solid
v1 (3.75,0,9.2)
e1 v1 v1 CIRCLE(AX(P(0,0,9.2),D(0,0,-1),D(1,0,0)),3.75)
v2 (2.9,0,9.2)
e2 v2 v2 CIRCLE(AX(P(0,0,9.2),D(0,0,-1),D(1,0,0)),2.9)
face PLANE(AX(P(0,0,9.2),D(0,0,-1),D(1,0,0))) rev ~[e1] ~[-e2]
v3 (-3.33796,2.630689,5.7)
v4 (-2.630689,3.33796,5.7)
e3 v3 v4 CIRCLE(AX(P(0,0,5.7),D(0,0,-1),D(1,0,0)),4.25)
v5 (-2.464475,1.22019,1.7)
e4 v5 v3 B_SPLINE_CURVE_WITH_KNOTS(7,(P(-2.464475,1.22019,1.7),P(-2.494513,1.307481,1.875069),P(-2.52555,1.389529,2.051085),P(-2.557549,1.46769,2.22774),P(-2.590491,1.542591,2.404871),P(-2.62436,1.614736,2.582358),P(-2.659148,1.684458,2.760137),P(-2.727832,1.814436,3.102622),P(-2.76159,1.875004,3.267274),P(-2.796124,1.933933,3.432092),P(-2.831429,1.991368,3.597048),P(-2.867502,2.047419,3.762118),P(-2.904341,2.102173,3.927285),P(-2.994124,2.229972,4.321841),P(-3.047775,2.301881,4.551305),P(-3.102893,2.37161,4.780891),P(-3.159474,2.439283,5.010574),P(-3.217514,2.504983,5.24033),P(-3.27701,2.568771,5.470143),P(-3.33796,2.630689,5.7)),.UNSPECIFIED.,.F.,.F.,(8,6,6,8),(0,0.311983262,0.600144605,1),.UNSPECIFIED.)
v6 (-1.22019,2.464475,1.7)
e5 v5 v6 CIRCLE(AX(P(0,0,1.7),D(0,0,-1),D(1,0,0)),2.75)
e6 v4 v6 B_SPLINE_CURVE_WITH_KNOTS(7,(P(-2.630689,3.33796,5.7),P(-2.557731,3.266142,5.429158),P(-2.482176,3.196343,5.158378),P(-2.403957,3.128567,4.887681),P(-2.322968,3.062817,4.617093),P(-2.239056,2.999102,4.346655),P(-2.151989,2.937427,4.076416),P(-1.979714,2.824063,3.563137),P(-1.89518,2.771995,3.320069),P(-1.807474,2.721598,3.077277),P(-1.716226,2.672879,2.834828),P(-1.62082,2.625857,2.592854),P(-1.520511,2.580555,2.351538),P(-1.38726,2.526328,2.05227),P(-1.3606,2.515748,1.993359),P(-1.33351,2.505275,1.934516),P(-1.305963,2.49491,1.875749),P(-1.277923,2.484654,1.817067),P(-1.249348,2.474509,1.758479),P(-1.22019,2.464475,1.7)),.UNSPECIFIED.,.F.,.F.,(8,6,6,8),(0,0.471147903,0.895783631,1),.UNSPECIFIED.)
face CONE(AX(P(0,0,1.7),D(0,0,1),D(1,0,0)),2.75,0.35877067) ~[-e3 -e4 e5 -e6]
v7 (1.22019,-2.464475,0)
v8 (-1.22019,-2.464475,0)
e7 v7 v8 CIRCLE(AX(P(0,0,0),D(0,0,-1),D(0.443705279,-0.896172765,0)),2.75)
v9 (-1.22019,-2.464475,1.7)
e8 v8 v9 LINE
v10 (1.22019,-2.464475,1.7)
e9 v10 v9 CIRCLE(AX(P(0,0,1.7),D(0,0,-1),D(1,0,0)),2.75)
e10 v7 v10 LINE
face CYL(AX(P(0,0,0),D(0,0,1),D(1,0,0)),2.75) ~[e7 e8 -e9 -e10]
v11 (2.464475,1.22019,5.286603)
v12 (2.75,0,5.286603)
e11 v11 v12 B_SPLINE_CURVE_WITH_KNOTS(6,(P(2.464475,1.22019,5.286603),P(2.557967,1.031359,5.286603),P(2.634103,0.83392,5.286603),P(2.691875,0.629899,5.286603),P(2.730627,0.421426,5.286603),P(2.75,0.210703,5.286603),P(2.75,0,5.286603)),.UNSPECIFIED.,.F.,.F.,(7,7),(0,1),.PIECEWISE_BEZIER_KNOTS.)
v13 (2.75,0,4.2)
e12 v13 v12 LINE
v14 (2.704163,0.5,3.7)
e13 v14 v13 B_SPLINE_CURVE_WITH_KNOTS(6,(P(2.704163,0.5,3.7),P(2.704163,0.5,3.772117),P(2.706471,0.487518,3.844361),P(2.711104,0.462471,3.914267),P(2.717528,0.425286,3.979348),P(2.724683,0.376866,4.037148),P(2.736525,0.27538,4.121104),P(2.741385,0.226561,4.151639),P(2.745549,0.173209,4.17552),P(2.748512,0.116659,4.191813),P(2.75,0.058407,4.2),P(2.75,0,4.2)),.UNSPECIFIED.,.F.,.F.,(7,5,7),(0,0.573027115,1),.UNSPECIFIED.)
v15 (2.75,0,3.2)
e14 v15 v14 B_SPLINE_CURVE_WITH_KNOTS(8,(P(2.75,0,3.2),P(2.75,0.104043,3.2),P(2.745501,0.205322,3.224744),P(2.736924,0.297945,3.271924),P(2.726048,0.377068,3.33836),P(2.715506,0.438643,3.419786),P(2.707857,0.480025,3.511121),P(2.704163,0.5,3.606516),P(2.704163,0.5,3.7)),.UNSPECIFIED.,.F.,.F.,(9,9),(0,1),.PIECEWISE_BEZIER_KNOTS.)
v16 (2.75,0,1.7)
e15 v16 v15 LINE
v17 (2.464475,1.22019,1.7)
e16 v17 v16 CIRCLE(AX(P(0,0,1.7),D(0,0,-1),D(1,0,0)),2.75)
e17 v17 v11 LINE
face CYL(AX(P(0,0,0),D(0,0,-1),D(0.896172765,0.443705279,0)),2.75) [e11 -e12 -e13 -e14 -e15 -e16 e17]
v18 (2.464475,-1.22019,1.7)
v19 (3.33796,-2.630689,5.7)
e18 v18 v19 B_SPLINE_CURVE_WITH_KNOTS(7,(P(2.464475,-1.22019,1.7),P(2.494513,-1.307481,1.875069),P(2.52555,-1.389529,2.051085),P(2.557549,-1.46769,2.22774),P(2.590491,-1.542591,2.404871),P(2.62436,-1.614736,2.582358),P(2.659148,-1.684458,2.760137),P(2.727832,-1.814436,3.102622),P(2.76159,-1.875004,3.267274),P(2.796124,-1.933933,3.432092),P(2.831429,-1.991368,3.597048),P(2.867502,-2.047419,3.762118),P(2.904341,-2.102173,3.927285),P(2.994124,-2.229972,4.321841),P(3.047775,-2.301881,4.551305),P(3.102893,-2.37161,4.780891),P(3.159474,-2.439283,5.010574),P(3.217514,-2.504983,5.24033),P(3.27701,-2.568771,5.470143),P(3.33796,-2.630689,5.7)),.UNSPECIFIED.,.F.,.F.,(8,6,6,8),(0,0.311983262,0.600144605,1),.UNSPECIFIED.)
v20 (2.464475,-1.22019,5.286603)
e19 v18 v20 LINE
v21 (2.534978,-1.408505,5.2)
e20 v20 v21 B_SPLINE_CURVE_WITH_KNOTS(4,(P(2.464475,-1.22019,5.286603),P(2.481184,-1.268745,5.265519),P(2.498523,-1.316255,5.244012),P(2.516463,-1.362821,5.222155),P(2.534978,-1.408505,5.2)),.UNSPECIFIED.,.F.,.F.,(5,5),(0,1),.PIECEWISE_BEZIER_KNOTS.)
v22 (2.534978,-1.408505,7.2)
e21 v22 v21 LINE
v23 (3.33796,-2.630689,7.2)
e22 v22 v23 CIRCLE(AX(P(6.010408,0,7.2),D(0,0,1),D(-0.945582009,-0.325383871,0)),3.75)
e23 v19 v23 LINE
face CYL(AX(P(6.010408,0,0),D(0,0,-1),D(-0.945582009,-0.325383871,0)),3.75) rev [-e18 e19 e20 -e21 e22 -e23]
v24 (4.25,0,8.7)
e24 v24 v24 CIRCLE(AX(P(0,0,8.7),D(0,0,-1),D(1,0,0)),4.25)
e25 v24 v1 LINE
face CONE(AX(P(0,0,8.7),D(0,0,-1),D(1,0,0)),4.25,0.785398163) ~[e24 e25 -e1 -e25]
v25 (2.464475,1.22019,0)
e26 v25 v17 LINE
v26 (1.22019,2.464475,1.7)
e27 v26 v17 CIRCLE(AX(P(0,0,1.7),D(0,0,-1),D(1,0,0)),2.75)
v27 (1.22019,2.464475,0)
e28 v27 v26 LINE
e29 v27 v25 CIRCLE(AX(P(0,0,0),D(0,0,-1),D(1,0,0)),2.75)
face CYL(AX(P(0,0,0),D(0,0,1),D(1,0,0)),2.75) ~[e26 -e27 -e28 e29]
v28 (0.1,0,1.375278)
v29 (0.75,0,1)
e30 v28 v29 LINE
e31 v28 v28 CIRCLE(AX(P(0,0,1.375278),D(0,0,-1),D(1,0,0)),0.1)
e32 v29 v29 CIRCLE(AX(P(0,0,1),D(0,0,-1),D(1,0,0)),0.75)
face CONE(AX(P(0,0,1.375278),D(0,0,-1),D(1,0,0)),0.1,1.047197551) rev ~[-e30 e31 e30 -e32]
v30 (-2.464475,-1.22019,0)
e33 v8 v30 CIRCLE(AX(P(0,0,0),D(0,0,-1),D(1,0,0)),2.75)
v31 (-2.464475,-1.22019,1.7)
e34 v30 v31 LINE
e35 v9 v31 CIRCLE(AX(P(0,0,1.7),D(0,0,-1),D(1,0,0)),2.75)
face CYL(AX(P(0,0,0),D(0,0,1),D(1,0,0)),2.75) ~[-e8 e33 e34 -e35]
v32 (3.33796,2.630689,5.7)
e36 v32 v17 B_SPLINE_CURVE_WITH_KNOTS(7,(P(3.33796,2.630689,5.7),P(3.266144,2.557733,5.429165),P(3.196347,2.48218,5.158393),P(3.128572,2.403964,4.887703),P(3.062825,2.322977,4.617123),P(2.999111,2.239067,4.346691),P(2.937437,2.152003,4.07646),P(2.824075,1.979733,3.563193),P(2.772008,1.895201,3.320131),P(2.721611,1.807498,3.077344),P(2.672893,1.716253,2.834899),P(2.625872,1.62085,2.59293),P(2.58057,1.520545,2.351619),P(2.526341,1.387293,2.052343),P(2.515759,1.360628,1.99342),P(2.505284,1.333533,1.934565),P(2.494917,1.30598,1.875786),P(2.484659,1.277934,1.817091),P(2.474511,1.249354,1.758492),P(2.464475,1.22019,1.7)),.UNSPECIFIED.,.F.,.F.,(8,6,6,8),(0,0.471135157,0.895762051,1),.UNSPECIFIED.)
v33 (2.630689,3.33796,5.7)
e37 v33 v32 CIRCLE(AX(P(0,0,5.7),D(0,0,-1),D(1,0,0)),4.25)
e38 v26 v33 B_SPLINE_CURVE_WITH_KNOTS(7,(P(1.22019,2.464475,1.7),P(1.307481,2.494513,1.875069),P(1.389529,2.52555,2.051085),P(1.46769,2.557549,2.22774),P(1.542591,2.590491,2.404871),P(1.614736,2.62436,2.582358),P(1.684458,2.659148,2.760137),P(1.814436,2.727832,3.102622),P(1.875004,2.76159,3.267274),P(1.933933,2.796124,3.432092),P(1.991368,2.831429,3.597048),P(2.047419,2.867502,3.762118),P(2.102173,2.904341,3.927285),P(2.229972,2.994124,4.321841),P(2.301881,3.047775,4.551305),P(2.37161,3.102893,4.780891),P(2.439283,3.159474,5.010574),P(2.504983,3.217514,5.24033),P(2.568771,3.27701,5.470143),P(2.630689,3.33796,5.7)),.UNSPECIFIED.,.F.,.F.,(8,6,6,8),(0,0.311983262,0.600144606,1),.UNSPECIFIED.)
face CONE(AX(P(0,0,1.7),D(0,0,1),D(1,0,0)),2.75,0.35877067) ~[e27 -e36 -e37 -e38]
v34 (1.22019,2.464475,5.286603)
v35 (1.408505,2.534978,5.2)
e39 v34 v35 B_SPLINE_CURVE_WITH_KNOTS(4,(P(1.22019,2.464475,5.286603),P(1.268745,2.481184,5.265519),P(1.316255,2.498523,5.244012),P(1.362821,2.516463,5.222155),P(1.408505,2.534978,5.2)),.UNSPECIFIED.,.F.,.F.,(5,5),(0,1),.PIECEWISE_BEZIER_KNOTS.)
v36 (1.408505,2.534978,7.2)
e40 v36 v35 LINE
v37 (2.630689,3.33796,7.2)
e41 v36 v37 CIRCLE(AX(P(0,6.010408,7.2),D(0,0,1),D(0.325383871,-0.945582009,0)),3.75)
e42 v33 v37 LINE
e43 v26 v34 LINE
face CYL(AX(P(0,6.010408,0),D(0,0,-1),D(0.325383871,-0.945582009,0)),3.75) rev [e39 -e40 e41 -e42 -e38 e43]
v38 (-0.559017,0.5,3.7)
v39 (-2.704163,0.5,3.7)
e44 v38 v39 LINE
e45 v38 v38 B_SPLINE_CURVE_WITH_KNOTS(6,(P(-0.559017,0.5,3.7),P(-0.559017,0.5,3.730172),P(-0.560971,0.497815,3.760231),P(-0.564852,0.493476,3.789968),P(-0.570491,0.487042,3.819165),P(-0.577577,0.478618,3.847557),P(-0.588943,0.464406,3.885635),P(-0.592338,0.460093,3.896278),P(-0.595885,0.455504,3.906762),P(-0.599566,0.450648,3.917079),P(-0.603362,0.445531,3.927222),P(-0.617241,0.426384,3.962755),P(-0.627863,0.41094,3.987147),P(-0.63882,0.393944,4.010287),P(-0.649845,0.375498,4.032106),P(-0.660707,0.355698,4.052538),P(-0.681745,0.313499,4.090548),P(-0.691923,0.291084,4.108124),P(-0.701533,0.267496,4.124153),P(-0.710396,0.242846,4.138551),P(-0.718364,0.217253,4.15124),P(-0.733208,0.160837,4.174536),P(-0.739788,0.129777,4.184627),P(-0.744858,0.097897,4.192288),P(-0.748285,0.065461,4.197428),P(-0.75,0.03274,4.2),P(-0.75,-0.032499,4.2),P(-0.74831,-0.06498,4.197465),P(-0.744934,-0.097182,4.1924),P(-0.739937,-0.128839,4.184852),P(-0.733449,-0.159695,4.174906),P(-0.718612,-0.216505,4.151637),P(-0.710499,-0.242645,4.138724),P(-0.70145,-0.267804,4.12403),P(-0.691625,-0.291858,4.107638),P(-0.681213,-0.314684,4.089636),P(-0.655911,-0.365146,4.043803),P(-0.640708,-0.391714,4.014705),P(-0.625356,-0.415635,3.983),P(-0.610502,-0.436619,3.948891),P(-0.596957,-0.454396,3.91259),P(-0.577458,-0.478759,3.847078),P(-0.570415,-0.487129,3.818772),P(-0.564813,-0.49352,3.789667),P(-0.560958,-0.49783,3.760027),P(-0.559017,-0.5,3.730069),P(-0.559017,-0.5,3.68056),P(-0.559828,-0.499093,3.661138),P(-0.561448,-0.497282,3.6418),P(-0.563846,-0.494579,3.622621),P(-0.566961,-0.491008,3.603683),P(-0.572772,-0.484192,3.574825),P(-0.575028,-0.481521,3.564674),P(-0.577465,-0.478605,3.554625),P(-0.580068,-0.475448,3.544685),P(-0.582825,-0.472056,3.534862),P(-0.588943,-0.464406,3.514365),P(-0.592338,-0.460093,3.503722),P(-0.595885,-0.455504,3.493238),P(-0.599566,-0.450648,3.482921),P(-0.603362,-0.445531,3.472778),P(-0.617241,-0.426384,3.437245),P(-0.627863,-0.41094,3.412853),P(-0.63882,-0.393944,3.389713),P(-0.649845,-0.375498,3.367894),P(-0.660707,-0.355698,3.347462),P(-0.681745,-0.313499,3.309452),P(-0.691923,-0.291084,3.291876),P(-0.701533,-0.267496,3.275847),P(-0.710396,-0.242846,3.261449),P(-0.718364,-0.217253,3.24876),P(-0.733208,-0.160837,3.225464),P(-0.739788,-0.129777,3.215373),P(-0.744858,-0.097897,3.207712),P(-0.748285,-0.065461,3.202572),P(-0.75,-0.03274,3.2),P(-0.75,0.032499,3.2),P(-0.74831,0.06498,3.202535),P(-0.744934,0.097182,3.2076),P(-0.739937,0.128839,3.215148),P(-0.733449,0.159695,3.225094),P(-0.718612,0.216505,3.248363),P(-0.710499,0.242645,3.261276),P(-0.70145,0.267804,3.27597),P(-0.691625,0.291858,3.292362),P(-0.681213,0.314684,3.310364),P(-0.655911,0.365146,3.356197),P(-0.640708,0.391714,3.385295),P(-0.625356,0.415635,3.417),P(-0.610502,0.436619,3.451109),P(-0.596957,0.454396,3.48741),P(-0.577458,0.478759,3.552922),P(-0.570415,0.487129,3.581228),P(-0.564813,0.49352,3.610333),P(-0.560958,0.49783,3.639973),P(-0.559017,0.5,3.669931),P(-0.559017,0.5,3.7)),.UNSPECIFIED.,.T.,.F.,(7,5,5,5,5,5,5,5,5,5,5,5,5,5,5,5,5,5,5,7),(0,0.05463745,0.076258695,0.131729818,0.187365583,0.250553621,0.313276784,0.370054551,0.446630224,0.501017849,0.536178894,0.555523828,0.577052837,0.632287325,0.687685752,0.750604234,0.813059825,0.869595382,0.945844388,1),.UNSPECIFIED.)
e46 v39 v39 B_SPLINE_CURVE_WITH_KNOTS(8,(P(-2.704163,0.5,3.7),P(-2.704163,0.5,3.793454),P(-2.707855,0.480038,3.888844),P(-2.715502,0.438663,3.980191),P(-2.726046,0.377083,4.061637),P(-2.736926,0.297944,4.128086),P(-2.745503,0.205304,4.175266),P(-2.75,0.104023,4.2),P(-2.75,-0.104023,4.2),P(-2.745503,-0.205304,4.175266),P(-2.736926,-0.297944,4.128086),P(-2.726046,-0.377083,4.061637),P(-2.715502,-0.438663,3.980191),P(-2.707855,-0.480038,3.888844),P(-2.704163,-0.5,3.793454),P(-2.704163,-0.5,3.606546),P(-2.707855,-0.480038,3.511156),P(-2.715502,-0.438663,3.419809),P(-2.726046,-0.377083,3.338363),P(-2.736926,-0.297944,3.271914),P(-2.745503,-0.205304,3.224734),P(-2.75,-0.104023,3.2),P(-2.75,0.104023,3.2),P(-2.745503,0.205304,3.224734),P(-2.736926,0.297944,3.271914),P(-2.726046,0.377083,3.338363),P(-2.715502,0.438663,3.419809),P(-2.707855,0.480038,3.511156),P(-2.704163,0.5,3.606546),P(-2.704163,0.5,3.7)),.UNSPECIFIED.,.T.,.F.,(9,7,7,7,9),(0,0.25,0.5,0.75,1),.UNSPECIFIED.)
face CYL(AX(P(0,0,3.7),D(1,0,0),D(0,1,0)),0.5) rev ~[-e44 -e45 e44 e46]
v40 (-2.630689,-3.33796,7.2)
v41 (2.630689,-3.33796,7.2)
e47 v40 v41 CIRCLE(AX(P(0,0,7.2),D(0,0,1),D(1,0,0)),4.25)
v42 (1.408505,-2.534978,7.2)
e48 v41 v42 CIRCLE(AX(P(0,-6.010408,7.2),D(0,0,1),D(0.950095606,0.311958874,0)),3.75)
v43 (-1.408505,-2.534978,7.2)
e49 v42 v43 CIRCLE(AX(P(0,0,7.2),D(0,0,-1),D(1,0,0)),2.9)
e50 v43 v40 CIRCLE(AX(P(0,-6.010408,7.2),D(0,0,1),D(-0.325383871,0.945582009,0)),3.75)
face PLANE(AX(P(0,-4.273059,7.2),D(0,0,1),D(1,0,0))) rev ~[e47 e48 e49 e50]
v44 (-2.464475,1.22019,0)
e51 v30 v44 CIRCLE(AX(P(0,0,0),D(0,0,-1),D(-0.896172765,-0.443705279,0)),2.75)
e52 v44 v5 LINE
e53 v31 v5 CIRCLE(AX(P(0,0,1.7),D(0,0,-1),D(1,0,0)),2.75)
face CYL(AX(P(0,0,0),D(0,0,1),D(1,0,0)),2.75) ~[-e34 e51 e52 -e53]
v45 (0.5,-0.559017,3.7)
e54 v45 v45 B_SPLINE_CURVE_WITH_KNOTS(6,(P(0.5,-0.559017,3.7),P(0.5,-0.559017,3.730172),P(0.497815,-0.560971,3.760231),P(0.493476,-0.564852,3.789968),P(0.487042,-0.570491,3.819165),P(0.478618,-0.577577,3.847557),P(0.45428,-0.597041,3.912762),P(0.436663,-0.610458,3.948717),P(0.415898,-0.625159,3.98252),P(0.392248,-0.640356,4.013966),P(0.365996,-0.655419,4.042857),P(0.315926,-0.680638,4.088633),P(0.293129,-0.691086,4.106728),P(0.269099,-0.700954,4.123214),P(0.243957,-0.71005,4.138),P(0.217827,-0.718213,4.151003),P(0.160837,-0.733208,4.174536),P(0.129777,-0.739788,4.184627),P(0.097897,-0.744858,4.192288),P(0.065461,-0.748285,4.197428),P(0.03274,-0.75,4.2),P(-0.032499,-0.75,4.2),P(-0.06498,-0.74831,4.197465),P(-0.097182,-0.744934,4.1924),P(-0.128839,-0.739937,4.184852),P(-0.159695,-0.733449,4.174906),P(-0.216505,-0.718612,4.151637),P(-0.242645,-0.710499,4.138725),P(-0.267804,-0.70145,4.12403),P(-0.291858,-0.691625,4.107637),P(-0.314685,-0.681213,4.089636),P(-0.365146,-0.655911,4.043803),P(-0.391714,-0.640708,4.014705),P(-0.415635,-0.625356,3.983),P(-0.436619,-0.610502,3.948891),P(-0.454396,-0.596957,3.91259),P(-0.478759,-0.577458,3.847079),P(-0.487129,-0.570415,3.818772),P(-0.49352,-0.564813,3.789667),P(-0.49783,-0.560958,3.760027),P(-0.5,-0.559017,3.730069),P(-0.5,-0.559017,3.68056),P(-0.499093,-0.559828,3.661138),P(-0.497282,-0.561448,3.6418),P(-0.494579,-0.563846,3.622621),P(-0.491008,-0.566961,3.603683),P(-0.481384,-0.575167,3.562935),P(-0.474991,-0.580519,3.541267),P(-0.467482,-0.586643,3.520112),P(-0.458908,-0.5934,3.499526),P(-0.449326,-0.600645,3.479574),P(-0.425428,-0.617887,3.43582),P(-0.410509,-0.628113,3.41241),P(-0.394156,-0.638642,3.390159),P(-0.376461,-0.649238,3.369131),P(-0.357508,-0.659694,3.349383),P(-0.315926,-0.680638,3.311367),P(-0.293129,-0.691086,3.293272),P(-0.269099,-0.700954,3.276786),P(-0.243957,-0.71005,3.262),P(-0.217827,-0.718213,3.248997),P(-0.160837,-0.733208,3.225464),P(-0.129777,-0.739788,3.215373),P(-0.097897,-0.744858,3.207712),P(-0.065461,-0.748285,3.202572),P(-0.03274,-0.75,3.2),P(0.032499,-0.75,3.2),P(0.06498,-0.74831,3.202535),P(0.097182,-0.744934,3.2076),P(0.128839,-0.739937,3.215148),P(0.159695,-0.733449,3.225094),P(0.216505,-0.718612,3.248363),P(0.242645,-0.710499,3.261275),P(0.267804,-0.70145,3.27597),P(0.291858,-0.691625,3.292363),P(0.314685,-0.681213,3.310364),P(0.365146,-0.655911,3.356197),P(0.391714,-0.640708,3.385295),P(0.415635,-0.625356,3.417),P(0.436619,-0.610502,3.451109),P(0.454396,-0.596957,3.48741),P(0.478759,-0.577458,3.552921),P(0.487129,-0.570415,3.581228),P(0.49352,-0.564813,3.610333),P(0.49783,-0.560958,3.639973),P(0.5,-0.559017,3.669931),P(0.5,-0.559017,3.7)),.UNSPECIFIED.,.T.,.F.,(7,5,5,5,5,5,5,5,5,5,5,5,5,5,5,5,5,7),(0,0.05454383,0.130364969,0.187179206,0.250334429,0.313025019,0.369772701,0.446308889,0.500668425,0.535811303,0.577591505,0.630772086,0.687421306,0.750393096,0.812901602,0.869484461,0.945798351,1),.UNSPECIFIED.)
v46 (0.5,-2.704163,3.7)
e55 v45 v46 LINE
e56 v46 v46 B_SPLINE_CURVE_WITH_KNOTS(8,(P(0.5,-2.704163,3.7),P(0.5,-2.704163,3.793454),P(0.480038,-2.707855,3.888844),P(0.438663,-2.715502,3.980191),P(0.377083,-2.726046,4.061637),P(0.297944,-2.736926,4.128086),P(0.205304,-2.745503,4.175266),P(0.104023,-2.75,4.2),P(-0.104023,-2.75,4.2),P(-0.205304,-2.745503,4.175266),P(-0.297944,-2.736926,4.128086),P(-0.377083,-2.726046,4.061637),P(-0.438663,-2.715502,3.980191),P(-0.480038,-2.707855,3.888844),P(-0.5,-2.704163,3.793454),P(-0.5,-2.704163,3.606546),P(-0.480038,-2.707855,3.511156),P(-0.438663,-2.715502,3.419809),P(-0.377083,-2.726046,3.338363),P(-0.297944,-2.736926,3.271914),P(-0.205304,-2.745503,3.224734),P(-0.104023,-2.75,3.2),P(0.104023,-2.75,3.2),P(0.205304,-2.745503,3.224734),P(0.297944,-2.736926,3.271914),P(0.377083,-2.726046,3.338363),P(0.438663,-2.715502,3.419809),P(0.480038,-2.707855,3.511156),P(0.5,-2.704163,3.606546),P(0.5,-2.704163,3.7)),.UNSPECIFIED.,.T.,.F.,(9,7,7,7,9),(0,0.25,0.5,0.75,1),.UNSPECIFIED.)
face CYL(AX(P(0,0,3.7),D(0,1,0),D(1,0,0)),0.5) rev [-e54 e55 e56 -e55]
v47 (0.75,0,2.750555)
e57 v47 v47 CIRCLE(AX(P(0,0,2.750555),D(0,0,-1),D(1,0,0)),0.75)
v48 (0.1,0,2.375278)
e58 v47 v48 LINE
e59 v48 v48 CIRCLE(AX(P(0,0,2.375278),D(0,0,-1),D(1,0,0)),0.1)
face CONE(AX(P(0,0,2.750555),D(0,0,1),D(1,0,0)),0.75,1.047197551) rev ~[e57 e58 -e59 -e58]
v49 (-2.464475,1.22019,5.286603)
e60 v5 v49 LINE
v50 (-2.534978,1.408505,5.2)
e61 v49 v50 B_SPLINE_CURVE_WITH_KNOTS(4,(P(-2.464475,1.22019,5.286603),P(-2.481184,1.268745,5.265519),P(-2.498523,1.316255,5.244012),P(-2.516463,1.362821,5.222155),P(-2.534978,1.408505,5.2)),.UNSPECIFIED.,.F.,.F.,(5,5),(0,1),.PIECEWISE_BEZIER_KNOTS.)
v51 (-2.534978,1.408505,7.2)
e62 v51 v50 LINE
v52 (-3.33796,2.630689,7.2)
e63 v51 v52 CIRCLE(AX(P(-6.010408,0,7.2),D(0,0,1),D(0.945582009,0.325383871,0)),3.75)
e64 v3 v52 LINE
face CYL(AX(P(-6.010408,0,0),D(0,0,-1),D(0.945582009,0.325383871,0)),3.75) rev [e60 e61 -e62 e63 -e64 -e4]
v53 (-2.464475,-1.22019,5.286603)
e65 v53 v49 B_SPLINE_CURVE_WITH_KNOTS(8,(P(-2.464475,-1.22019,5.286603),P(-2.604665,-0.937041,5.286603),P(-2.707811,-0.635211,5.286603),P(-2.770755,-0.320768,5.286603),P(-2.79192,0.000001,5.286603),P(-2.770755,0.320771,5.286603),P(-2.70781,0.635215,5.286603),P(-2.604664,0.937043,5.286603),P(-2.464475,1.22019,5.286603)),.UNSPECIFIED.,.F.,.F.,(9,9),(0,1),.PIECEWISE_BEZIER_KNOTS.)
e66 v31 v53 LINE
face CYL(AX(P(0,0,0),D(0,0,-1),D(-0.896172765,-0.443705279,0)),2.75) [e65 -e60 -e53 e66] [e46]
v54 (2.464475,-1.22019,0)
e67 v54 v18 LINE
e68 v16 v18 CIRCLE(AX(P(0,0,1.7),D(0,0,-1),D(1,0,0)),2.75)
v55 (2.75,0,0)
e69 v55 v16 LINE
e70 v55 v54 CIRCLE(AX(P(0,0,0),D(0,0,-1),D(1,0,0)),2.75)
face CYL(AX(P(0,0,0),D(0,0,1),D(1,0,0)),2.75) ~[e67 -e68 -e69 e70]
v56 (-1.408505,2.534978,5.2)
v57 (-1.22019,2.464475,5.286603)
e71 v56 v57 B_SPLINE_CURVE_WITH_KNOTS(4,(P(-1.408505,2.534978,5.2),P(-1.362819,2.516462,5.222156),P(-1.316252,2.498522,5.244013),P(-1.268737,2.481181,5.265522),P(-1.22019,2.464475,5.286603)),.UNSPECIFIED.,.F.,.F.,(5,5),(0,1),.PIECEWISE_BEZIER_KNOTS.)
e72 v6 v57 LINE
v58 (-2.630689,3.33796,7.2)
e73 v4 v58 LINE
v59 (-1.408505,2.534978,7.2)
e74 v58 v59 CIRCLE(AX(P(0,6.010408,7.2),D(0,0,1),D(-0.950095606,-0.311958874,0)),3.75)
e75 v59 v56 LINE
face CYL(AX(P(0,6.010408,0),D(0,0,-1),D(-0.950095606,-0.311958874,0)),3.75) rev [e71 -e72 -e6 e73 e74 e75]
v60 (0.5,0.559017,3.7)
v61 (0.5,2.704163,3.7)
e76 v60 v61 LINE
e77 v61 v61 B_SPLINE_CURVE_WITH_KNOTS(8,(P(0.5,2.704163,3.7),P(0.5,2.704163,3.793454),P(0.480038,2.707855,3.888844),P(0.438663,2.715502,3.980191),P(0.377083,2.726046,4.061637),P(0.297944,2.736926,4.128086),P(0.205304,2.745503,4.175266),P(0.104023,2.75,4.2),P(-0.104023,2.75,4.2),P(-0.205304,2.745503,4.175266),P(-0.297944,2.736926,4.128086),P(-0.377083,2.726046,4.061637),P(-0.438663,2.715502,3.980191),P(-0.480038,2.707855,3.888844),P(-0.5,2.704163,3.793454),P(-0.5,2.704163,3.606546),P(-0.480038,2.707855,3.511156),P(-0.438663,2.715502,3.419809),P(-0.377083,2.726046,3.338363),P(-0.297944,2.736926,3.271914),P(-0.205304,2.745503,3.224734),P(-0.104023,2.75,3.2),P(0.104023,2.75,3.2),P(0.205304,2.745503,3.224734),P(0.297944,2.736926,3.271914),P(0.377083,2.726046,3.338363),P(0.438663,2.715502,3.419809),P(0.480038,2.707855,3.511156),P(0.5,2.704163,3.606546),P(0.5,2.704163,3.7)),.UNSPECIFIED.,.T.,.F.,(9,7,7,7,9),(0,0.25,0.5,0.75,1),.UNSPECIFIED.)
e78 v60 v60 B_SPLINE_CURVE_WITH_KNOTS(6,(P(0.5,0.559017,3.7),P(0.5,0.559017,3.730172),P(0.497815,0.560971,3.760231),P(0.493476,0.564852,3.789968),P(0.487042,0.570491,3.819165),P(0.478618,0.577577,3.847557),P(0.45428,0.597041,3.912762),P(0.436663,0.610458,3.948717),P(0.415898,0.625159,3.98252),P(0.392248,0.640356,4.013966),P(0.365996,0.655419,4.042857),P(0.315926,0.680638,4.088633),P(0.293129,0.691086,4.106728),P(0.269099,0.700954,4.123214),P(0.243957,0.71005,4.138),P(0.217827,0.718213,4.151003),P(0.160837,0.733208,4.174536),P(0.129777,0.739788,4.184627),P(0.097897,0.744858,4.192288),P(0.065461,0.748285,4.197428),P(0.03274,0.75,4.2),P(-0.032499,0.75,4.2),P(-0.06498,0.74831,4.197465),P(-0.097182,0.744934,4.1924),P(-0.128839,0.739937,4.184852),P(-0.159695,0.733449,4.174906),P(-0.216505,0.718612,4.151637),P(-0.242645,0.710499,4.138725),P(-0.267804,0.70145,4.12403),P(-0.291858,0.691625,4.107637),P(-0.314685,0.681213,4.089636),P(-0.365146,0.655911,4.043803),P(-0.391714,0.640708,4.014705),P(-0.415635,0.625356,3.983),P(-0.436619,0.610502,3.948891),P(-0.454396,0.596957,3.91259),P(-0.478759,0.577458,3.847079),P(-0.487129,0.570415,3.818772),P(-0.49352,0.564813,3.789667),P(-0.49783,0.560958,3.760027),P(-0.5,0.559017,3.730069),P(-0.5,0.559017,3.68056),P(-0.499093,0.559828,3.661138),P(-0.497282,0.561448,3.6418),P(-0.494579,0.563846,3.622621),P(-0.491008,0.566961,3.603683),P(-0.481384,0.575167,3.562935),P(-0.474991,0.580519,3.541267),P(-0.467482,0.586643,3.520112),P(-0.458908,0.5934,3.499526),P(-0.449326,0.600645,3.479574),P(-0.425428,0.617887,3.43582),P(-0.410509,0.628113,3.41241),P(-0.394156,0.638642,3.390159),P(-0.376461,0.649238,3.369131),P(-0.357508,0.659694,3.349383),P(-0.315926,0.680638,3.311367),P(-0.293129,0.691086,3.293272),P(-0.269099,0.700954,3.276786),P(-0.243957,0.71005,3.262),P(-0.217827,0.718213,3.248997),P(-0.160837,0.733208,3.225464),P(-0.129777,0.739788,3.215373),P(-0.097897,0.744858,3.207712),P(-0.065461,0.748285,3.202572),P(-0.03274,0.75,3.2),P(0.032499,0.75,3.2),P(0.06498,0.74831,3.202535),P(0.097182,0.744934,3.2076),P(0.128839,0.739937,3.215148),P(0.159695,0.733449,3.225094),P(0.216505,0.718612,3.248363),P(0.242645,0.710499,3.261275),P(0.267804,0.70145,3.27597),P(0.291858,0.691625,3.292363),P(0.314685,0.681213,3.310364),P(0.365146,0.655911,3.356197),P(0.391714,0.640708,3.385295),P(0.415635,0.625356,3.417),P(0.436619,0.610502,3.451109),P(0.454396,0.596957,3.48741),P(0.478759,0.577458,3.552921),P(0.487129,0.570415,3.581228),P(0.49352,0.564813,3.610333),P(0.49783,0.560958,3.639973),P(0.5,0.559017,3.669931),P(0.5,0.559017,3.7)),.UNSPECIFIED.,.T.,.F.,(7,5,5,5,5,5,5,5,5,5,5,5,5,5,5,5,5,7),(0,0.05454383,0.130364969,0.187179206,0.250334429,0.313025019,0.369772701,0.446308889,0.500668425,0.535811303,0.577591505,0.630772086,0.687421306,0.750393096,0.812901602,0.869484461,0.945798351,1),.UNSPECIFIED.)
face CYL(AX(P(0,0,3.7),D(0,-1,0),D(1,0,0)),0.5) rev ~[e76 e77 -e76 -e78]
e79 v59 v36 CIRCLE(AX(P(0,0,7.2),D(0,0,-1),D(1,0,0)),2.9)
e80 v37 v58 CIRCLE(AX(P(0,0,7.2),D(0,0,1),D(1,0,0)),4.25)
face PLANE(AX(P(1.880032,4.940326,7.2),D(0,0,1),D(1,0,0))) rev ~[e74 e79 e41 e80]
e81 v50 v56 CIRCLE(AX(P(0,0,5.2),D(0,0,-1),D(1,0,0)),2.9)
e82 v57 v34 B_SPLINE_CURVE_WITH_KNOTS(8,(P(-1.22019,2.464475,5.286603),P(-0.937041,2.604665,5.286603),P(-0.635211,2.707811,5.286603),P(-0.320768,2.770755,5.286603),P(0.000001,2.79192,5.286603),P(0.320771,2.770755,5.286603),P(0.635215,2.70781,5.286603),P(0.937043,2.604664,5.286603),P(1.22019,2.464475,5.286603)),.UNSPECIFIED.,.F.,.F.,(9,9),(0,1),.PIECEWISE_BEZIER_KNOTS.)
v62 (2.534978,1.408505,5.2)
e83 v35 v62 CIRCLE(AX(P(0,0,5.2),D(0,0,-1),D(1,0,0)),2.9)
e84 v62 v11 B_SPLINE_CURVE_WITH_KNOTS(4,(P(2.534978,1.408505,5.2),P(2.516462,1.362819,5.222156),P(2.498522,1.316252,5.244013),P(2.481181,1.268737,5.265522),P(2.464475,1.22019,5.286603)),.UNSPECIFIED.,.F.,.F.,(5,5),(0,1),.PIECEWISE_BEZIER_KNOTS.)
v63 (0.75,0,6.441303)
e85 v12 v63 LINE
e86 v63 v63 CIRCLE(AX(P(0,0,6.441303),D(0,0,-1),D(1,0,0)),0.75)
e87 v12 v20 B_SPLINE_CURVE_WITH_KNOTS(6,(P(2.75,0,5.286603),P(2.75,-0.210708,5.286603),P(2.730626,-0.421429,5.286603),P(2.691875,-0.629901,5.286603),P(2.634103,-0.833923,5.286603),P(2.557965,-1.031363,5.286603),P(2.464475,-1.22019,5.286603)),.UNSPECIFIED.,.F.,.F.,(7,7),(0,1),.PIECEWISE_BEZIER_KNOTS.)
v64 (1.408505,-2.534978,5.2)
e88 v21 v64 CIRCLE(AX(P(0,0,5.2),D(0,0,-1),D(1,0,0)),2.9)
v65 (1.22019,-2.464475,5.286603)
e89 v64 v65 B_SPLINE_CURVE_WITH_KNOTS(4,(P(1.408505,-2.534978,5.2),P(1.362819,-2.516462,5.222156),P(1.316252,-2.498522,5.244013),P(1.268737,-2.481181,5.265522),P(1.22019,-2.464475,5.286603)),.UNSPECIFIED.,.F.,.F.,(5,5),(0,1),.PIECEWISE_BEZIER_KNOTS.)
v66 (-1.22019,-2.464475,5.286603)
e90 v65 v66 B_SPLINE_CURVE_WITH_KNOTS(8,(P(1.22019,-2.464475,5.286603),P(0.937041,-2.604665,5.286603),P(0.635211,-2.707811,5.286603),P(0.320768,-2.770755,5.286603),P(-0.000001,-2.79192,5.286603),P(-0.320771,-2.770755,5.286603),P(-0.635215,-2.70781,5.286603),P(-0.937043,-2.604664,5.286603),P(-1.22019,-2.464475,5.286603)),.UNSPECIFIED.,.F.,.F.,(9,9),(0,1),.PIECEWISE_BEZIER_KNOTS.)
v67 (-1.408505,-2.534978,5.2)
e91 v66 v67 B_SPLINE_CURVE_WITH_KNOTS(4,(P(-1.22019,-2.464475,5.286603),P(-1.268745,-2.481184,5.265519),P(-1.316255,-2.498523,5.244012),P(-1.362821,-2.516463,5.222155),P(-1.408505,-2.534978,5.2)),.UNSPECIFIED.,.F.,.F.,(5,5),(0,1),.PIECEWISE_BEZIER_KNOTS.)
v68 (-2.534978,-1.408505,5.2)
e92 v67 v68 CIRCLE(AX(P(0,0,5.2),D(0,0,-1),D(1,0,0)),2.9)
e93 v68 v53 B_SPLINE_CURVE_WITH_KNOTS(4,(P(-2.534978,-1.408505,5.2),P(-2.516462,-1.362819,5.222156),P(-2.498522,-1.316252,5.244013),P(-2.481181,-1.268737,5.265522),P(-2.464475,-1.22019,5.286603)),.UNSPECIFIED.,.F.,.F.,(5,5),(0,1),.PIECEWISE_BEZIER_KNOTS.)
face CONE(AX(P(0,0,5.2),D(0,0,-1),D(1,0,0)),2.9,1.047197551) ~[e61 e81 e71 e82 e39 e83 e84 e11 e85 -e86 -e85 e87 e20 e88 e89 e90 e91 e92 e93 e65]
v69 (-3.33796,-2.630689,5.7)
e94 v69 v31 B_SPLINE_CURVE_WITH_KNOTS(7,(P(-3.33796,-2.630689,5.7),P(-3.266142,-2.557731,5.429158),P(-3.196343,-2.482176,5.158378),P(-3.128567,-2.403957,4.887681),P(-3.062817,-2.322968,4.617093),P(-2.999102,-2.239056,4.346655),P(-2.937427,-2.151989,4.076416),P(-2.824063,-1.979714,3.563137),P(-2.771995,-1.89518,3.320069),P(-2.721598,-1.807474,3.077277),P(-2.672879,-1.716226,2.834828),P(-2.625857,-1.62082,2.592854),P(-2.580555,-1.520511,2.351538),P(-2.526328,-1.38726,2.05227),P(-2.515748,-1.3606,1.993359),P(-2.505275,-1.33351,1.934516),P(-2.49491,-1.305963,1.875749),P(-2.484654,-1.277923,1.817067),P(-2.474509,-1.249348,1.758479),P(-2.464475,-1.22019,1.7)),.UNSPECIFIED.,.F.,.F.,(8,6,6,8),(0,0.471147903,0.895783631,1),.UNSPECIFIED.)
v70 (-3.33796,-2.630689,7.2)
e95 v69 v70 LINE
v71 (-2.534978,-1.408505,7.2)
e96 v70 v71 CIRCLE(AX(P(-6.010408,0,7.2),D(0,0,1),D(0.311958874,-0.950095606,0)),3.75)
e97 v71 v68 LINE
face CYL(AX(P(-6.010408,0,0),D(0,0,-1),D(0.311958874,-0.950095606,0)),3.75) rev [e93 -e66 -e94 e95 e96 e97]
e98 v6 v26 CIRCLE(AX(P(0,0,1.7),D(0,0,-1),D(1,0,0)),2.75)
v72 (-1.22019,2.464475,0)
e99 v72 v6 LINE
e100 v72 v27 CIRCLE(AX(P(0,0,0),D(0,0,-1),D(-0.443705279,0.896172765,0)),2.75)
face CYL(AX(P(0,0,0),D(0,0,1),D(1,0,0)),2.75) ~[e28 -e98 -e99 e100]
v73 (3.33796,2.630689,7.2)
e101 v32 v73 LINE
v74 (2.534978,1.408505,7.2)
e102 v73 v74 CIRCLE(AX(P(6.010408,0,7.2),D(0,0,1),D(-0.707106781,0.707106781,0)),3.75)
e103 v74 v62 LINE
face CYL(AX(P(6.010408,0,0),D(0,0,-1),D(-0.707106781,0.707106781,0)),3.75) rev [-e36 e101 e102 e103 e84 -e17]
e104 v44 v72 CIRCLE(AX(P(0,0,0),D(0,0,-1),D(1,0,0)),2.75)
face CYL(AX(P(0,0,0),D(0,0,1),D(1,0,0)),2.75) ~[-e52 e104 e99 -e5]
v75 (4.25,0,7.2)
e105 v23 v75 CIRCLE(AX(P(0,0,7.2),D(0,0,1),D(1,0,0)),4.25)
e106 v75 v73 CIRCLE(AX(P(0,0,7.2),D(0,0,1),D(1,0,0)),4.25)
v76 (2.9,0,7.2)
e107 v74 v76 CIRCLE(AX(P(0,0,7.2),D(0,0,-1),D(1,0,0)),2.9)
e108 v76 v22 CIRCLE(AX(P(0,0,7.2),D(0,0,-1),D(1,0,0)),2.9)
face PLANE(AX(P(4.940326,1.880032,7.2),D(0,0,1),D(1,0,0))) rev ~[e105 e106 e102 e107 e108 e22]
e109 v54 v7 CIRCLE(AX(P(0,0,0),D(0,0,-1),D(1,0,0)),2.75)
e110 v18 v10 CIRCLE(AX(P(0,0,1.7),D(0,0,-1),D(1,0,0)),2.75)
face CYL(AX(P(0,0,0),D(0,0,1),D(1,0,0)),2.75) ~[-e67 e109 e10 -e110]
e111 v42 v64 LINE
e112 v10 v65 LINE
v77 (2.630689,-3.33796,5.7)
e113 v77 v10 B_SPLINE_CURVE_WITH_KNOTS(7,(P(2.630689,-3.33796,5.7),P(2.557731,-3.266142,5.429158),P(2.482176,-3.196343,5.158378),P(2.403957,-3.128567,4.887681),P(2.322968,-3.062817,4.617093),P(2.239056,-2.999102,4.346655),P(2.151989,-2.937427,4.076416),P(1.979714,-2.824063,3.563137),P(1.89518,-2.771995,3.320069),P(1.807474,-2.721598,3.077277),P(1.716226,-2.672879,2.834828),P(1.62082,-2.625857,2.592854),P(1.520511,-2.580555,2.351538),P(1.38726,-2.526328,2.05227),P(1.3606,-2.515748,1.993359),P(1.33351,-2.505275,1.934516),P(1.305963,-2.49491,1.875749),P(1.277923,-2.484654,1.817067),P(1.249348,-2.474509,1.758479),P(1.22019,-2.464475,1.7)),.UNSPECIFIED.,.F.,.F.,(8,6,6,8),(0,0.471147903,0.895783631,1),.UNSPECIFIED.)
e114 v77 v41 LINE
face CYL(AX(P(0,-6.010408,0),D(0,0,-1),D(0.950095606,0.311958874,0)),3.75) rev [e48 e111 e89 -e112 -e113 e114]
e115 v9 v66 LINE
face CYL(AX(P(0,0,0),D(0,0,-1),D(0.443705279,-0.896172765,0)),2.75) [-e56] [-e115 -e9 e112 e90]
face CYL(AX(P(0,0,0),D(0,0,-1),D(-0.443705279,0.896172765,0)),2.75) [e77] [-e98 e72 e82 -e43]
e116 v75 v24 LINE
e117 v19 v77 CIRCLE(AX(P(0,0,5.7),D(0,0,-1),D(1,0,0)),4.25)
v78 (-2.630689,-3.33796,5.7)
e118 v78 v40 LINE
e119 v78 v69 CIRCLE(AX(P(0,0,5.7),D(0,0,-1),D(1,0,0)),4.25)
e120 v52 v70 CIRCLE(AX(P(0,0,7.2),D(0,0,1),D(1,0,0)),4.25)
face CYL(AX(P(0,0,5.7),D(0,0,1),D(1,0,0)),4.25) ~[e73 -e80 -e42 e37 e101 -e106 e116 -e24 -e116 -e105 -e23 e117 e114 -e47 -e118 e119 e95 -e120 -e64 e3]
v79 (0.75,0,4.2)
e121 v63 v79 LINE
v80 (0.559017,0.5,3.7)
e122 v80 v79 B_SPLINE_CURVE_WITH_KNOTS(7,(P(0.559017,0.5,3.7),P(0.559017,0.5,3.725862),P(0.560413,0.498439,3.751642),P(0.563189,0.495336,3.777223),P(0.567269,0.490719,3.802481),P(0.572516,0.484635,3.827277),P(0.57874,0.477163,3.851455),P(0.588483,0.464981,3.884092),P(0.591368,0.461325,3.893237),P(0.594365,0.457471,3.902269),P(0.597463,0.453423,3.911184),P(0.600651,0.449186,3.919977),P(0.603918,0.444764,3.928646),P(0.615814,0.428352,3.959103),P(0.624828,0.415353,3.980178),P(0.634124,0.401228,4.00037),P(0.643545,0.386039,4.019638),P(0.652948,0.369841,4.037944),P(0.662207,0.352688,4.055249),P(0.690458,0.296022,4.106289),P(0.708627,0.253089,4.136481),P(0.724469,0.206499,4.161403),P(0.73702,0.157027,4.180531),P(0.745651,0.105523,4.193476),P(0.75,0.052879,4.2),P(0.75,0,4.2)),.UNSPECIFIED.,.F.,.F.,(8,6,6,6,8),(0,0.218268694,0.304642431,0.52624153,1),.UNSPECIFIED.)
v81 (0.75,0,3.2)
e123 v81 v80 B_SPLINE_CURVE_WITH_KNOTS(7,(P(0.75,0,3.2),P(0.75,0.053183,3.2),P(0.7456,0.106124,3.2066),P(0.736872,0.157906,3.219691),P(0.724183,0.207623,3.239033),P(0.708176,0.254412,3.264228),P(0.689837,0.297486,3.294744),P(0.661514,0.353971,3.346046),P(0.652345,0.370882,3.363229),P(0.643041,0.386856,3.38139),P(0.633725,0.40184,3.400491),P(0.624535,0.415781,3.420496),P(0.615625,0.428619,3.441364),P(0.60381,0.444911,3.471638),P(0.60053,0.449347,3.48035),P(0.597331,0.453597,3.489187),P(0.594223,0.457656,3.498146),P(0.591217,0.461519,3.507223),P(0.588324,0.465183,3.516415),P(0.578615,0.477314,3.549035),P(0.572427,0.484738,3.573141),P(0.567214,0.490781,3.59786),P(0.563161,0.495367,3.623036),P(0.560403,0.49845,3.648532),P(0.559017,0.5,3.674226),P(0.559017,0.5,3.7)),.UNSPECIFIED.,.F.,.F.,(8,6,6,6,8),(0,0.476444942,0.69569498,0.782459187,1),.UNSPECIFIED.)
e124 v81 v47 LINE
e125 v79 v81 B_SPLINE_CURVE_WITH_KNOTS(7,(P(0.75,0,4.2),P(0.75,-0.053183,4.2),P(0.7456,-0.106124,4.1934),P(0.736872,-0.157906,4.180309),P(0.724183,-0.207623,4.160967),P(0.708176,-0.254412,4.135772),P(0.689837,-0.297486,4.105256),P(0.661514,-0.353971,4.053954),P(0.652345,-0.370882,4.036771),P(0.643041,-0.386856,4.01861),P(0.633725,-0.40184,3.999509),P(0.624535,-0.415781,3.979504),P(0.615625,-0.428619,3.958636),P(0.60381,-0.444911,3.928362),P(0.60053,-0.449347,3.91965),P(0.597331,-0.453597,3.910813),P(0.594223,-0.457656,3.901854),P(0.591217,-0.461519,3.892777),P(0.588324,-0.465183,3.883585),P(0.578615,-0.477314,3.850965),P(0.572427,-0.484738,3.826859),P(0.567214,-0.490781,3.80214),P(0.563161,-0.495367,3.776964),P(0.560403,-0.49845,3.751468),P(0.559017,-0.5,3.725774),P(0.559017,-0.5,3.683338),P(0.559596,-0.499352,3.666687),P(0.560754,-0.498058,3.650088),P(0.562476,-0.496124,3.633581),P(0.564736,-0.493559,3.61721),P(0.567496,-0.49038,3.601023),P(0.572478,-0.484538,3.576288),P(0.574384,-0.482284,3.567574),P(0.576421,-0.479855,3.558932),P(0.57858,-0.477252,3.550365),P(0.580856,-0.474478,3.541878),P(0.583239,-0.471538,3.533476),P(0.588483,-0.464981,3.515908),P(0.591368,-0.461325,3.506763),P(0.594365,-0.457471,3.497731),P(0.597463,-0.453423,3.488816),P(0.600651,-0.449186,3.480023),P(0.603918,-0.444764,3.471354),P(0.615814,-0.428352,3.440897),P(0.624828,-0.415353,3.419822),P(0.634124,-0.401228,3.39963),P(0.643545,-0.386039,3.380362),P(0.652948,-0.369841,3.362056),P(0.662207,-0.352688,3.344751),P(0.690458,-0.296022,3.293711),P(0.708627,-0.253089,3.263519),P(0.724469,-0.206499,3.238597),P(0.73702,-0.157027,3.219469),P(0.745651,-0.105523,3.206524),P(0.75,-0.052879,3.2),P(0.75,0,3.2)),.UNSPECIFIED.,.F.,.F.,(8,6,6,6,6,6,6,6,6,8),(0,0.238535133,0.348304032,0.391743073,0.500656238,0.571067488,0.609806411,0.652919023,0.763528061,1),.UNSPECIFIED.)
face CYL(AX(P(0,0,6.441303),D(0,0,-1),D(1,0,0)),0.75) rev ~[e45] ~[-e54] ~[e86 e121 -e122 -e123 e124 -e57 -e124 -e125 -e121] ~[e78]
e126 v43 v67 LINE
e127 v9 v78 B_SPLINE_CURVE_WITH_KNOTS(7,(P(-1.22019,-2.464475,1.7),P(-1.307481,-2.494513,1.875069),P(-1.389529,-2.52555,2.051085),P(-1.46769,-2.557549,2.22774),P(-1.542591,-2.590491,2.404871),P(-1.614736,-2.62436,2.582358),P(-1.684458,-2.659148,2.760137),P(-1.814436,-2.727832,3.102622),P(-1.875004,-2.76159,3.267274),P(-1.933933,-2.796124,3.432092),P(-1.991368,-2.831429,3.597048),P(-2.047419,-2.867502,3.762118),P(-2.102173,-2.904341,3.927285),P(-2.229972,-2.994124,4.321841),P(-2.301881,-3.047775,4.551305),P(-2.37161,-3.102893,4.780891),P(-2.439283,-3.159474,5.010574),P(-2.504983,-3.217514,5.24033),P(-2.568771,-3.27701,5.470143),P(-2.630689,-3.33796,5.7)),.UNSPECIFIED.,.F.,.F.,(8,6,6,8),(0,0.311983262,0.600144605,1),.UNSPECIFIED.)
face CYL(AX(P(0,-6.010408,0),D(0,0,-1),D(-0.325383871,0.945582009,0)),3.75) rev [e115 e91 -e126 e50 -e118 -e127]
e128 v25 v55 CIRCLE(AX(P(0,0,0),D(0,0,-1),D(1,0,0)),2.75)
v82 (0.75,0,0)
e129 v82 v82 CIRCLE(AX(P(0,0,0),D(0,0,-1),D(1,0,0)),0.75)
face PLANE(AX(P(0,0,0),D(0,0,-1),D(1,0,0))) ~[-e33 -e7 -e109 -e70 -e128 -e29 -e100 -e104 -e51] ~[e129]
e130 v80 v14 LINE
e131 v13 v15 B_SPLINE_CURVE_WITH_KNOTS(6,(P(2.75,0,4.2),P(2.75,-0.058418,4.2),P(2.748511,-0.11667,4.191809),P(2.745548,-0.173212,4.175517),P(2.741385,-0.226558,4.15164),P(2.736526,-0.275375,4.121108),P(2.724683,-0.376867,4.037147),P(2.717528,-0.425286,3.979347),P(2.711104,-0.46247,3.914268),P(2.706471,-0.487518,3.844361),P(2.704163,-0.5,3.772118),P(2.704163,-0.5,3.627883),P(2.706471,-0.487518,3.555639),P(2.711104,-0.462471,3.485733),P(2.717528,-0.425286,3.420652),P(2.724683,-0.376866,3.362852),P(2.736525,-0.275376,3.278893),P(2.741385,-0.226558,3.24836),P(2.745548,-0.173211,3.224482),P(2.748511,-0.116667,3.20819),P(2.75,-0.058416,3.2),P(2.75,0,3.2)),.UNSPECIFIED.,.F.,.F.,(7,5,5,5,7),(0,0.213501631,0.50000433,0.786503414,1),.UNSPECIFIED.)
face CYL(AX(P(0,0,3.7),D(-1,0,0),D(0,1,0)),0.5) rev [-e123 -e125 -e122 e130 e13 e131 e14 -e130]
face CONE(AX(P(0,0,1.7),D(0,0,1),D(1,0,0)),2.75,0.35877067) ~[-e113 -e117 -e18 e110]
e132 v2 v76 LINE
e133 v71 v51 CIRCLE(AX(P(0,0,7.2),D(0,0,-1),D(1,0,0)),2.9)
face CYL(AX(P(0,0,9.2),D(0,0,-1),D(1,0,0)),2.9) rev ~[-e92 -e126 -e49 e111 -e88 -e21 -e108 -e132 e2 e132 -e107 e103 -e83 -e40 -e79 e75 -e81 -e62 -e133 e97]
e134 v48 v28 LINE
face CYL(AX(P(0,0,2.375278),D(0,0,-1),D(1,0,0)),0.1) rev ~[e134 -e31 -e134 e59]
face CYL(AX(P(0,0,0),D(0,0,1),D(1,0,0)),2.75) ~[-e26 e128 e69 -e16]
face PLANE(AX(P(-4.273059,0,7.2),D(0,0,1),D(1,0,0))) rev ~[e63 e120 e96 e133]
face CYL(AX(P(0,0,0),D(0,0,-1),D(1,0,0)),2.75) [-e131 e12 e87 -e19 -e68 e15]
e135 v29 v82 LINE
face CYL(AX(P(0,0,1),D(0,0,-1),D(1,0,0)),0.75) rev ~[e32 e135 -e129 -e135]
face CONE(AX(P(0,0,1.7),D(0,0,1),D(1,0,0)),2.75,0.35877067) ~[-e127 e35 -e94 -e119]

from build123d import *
from build123d import SkipClean  # not in build123d's __all__

# Parameters (mm, degrees)
F2_R          = 0.5
F3_DEPTH      = 4.251
F3_DEPTH_BACK = 4.251
F4_R          = 0.5
F5_DEPTH      = 4.2510001
F5_DEPTH_BACK = 4.2510001
F7_DEPTH      = 7.2
F8_SIZE2      = 0.5
F8_SIZE       = 0.5


with BuildPart() as f1:
    # F0 (on Front) → F1 (revolve)
    with BuildSketch(Plane.XZ):
        Polygon((0.75, 1), (0.75, 0), (2.75, 0), (2.75, 1.7), (4.25, 5.7), (4.25, 9.2), (2.9, 9.2), (2.9, 5.2), (0.75, 6.4413030788), (0.75, 2.7505553499), (0.1, 2.375277675), (0.1, 1.375277675), align=None)
    revolve(axis=Axis((0, 0, 4.6), (0, 0, -1)))

    # F2 (on Front) → F3 (cut, two sides)
    with BuildSketch(Plane.XZ) as f3_sk:
        with Locations((0, 3.7)):
            Circle(F2_R)
    extrude(amount=-F3_DEPTH, mode=Mode.SUBTRACT)
    extrude(f3_sk.sketch, amount=F3_DEPTH_BACK, mode=Mode.SUBTRACT)

    # F4 (on Right) → F5 (cut, two sides)
    with BuildSketch(Plane.YZ) as f5_sk:
        with Locations((0, 3.7)):
            Circle(F4_R)
    extrude(amount=-F5_DEPTH, mode=Mode.SUBTRACT)
    extrude(f5_sk.sketch, amount=F5_DEPTH_BACK, mode=Mode.SUBTRACT)

    # F6 (on Top) → F7 (cut)
    with BuildSketch(Plane.XY):
        with BuildLine():
            ThreePointArc((2.6516504294, 3.3587572106), (3.1943648253, 4.0460926544), (3.5628585232, 4.8405618624))
            ThreePointArc((3.5628585232, 4.8405618624), (1.875, 5.7104618903), (0, 6.0104076401))
            Line((0, 6.0104076401), (2.6516504294, 3.3587572106))
        make_face()
        with BuildLine():
            ThreePointArc((1.2201895167, 2.464475105), (1.9868873303, 2.8300336469), (2.6516504294, 3.3587572106))
            Line((2.6516504294, 3.3587572106), (0, 6.0104076401))
            ThreePointArc((0, 6.0104076401), (-1.875, 5.7104618903), (-3.5628585232, 4.8405618624))
            ThreePointArc((-3.5628585232, 4.8405618624), (-2.6703621866, 3.3776019518), (-1.2201895167, 2.464475105))
            ThreePointArc((-1.2201895167, 2.464475105), (0, 2.75), (1.2201895167, 2.464475105))
        make_face()
        with BuildLine():
            ThreePointArc((-3.5628585232, -4.8405618624), (0, -6.0104076401), (3.5628585232, -4.8405618624))
            ThreePointArc((3.5628585232, -4.8405618624), (2.6703621866, -3.3776019518), (1.2201895167, -2.464475105))
            ThreePointArc((1.2201895167, -2.464475105), (0, -2.75), (-1.2201895167, -2.464475105))
            ThreePointArc((-1.2201895167, -2.464475105), (-2.6703621866, -3.3776019518), (-3.5628585232, -4.8405618624))
        make_face()
        with BuildLine():
            ThreePointArc((-4.8405618624, 3.5628585232), (-6.0104076401, 0), (-4.8405618624, -3.5628585232))
            ThreePointArc((-4.8405618624, -3.5628585232), (-3.3776019518, -2.6703621866), (-2.464475105, -1.2201895167))
            ThreePointArc((-2.464475105, -1.2201895167), (-2.75, 0), (-2.464475105, 1.2201895167))
            ThreePointArc((-2.464475105, 1.2201895167), (-3.3776019518, 2.6703621866), (-4.8405618624, 3.5628585232))
        make_face()
        with BuildLine():
            Line((3.3587572106, 2.6516504294), (6.0104076401, 0))
            ThreePointArc((6.0104076401, 0), (5.7104618903, 1.875), (4.8405618624, 3.5628585232))
            ThreePointArc((4.8405618624, 3.5628585232), (4.0460926544, 3.1943648253), (3.3587572106, 2.6516504294))
        make_face()
        with BuildLine():
            ThreePointArc((4.8405618624, -3.5628585232), (5.7104618903, -1.875), (6.0104076401, 0))
            Line((6.0104076401, 0), (3.3587572106, 2.6516504294))
            ThreePointArc((3.3587572106, 2.6516504294), (2.8300336469, 1.9868873303), (2.464475105, 1.2201895167))
            ThreePointArc((2.464475105, 1.2201895167), (2.6776675054, 0.626575399), (2.75, 0))
            ThreePointArc((2.75, 0), (2.6776675054, -0.626575399), (2.464475105, -1.2201895167))
            ThreePointArc((2.464475105, -1.2201895167), (3.3776019518, -2.6703621866), (4.8405618624, -3.5628585232))
        make_face()
    with SkipClean():  # cleaning this boolean's faces spoils the solid; the shape is the same uncleaned
        extrude(amount=F7_DEPTH, mode=Mode.SUBTRACT)

    # F8
    f8_edges = [f1.edges().sort_by_distance(p)[0] for p in [
        (-4.25, 0, 9.2),
    ]]
    chamfer(f8_edges, length=F8_SIZE, length2=F8_SIZE2)


solid = f1.part
